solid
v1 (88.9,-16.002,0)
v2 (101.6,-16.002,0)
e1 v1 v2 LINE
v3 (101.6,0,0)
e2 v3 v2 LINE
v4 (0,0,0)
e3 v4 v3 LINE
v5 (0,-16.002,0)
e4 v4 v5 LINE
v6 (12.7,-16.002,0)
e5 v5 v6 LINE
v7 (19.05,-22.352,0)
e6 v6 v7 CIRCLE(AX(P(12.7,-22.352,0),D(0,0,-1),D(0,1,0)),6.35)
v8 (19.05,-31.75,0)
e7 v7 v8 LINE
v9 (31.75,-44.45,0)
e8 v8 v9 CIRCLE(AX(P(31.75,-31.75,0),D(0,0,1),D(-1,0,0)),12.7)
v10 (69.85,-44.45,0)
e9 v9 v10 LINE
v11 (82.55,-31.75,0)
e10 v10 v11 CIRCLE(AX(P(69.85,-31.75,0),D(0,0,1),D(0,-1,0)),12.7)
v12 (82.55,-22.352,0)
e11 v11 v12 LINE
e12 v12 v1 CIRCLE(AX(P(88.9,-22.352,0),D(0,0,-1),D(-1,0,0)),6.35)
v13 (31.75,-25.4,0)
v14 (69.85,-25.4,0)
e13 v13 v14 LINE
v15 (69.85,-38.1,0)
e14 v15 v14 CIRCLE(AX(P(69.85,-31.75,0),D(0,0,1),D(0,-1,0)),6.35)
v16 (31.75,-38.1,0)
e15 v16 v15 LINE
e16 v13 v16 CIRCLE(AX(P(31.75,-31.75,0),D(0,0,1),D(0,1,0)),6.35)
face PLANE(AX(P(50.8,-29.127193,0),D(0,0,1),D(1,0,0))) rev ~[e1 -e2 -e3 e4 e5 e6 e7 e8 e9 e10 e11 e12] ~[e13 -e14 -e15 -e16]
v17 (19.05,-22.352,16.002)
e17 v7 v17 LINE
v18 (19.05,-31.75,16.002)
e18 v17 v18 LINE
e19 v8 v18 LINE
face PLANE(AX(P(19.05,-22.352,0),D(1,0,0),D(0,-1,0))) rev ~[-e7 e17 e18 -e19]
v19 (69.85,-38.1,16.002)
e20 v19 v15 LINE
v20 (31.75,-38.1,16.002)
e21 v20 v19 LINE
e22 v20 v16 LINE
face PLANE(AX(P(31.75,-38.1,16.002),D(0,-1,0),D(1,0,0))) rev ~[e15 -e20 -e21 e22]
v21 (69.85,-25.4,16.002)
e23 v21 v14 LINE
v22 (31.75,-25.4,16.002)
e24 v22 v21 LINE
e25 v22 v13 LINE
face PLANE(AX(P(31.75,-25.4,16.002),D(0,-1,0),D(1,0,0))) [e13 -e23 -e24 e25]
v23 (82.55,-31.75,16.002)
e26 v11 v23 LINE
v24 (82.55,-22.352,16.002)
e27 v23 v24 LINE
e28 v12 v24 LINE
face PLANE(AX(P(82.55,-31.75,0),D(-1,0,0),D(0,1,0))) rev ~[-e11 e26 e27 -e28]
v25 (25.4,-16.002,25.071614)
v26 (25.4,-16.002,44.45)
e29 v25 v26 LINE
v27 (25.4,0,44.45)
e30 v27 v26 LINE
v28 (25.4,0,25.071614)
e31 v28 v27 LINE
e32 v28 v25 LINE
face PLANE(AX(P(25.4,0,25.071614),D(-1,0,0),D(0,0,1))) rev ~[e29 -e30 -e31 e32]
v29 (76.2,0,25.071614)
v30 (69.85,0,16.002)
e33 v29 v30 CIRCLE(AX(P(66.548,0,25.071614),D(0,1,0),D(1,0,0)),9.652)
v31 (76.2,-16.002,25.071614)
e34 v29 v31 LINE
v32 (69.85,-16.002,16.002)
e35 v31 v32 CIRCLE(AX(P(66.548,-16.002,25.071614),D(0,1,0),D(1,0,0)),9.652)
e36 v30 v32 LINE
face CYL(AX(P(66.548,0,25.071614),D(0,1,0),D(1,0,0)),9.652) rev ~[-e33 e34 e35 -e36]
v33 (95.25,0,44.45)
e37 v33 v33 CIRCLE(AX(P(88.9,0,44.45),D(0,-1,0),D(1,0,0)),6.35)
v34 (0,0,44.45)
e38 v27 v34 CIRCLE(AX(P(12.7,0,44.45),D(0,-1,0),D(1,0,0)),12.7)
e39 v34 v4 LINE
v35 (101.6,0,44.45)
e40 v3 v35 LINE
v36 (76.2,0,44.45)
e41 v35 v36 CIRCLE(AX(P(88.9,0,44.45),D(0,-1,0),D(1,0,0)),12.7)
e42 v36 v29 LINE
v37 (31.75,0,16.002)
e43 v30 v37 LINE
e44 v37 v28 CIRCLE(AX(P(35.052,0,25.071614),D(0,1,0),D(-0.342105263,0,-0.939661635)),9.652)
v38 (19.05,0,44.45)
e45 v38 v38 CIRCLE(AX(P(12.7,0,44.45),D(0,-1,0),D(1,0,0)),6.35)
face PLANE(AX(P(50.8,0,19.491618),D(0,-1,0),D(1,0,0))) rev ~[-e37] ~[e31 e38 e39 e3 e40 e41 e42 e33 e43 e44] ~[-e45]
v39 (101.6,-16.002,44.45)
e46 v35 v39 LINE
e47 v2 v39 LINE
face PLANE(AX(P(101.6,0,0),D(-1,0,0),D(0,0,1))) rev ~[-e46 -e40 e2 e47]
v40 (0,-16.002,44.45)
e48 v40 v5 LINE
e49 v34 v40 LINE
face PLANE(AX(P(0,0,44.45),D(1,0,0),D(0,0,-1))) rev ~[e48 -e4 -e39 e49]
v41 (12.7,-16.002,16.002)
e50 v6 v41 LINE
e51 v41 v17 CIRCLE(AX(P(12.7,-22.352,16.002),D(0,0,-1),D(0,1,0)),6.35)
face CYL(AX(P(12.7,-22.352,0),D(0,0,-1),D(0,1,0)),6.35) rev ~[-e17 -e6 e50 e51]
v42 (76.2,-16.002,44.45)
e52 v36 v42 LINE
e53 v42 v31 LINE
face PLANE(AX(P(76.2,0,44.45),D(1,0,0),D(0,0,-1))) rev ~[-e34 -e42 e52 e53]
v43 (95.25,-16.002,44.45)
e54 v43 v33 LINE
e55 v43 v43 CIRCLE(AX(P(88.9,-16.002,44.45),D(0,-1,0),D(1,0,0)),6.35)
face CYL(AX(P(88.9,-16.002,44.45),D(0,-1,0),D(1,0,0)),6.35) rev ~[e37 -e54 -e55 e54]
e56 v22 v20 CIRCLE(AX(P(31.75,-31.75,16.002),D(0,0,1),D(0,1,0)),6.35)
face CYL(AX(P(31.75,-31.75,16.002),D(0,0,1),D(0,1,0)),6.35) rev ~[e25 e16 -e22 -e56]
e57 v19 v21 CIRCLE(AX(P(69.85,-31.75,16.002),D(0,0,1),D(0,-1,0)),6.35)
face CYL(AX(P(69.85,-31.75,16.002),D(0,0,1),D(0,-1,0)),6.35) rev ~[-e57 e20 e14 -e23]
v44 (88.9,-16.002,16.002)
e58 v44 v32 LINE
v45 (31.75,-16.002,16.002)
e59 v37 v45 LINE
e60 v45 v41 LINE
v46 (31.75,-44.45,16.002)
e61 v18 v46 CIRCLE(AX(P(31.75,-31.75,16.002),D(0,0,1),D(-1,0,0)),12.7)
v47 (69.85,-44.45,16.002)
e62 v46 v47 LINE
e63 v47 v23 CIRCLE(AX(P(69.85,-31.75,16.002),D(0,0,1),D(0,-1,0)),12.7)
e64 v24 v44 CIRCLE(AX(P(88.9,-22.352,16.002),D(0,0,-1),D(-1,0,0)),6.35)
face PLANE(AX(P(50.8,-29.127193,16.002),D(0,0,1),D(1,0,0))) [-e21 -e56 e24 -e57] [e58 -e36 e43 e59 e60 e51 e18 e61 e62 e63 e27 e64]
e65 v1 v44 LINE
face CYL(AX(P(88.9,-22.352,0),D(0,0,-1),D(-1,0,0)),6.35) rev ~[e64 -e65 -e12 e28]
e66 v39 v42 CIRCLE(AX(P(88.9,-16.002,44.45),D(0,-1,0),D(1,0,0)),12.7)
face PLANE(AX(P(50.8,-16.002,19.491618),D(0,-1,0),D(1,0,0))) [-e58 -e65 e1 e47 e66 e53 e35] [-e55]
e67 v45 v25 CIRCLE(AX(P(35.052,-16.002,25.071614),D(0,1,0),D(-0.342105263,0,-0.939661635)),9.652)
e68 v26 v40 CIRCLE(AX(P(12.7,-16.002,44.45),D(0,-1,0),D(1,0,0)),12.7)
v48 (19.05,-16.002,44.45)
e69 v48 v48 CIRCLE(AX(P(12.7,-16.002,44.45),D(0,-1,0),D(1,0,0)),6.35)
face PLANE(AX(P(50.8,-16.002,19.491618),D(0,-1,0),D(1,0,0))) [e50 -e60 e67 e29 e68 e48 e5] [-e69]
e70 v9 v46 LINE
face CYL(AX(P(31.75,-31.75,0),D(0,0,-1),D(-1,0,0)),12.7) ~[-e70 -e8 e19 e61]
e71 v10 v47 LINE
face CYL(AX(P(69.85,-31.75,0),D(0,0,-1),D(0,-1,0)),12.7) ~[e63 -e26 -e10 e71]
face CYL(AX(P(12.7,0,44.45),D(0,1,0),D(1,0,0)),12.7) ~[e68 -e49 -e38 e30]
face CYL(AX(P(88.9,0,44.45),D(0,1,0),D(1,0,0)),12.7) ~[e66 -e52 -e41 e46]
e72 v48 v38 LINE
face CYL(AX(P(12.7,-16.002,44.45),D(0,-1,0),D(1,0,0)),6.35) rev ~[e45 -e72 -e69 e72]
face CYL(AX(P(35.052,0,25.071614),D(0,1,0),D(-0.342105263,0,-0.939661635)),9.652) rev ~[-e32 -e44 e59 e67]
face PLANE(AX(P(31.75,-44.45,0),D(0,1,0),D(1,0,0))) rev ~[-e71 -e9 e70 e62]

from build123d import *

# Parameters (mm, degrees)
F1_DEPTH = 16.002
F2_R     = 6.35
F3_DEPTH = 16.003
F6_DEPTH = 16.002
F4_W     = 38.1
F4_H     = 12.7
F7_DEPTH = 16.003


# Not quite as in the source:
# - a feature names something its author has since deleted; it is built from what else it names


with BuildPart() as f1:
    # F0 (on Front) → F1 (new body)
    with BuildSketch(Plane.XZ):
        with BuildLine():
            Line((0, 44.45), (0, 0))
            Line((0, 0), (101.6, 0))
            Line((101.6, 0), (101.6, 44.45))
            Line((101.6, 44.45), (76.2, 44.45))
            Line((76.2, 44.45), (76.2, 25.0716141042))
            ThreePointArc((76.2, 25.0716141042), (74.4547062675, 19.535812446), (69.85, 16.002))
            Line((69.85, 16.002), (31.75, 16.002))
            ThreePointArc((31.75, 16.002), (27.1452937325, 19.535812446), (25.4, 25.0716141042))
            Line((25.4, 25.0716141042), (25.4, 44.45))
            Line((25.4, 44.45), (0, 44.45))
        make_face()
        with BuildLine():
            ThreePointArc((25.4, 44.45), (12.7, 57.15), (0, 44.45))
            Line((0, 44.45), (25.4, 44.45))
        make_face()
        with BuildLine():
            Line((76.2, 44.45), (101.6, 44.45))
            ThreePointArc((101.6, 44.45), (88.9, 57.15), (76.2, 44.45))
        make_face()
    extrude(amount=F1_DEPTH)

    # F2 (on face) → F3 (cut, through all)
    with BuildSketch(Plane.XZ.offset(16.002)):
        with Locations((12.7, 44.45)):
            Circle(F2_R)
        with Locations((88.9, 44.45)):
            Circle(F2_R)
    extrude(amount=-F3_DEPTH, mode=Mode.SUBTRACT)

    # F5 (on Top) → F6 (join)
    with BuildSketch(Plane.XY):
        with BuildLine():
            ThreePointArc((19.05, -31.75), (22.7697438789, -40.7302561211), (31.75, -44.45))
            Line((31.75, -44.45), (69.85, -44.45))
            ThreePointArc((69.85, -44.45), (78.8302561211, -40.7302561211), (82.55, -31.75))
            Line((82.55, -31.75), (82.55, -22.352))
            Line((82.55, -22.352), (82.55, -16.002))
            Line((82.55, -16.002), (19.05, -16.002))
            Line((19.05, -16.002), (19.05, -22.352))
            Line((19.05, -22.352), (19.05, -31.75))
        make_face()
        with BuildLine():
            ThreePointArc((12.7, -16.002), (17.1901280605, -17.8618719395), (19.05, -22.352))
            Line((19.05, -22.352), (19.05, -16.002))
            Line((19.05, -16.002), (12.7, -16.002))
        make_face()
        with BuildLine():
            Line((82.55, -16.002), (82.55, -22.352))
            ThreePointArc((82.55, -22.352), (84.4098719395, -17.8618719395), (88.9, -16.002))
            Line((88.9, -16.002), (82.55, -16.002))
        make_face()
    extrude(amount=F6_DEPTH)

    # F4 (on face) → F7 (cut, through all)
    with BuildSketch(Plane.XY.offset(16.002)):
        with Locations((50.8, -31.75)):
            Rectangle(F4_W, F4_H)
        with BuildLine():
            Line((31.75, -38.1), (31.75, -25.4))
            ThreePointArc((31.75, -25.4), (25.4, -31.75), (31.75, -38.1))
        make_face()
        with BuildLine():
            ThreePointArc((69.85, -38.1), (76.2, -31.75), (69.85, -25.4))
            Line((69.85, -25.4), (69.85, -38.1))
        make_face()
    extrude(amount=-F7_DEPTH, mode=Mode.SUBTRACT)


solid = f1.part
